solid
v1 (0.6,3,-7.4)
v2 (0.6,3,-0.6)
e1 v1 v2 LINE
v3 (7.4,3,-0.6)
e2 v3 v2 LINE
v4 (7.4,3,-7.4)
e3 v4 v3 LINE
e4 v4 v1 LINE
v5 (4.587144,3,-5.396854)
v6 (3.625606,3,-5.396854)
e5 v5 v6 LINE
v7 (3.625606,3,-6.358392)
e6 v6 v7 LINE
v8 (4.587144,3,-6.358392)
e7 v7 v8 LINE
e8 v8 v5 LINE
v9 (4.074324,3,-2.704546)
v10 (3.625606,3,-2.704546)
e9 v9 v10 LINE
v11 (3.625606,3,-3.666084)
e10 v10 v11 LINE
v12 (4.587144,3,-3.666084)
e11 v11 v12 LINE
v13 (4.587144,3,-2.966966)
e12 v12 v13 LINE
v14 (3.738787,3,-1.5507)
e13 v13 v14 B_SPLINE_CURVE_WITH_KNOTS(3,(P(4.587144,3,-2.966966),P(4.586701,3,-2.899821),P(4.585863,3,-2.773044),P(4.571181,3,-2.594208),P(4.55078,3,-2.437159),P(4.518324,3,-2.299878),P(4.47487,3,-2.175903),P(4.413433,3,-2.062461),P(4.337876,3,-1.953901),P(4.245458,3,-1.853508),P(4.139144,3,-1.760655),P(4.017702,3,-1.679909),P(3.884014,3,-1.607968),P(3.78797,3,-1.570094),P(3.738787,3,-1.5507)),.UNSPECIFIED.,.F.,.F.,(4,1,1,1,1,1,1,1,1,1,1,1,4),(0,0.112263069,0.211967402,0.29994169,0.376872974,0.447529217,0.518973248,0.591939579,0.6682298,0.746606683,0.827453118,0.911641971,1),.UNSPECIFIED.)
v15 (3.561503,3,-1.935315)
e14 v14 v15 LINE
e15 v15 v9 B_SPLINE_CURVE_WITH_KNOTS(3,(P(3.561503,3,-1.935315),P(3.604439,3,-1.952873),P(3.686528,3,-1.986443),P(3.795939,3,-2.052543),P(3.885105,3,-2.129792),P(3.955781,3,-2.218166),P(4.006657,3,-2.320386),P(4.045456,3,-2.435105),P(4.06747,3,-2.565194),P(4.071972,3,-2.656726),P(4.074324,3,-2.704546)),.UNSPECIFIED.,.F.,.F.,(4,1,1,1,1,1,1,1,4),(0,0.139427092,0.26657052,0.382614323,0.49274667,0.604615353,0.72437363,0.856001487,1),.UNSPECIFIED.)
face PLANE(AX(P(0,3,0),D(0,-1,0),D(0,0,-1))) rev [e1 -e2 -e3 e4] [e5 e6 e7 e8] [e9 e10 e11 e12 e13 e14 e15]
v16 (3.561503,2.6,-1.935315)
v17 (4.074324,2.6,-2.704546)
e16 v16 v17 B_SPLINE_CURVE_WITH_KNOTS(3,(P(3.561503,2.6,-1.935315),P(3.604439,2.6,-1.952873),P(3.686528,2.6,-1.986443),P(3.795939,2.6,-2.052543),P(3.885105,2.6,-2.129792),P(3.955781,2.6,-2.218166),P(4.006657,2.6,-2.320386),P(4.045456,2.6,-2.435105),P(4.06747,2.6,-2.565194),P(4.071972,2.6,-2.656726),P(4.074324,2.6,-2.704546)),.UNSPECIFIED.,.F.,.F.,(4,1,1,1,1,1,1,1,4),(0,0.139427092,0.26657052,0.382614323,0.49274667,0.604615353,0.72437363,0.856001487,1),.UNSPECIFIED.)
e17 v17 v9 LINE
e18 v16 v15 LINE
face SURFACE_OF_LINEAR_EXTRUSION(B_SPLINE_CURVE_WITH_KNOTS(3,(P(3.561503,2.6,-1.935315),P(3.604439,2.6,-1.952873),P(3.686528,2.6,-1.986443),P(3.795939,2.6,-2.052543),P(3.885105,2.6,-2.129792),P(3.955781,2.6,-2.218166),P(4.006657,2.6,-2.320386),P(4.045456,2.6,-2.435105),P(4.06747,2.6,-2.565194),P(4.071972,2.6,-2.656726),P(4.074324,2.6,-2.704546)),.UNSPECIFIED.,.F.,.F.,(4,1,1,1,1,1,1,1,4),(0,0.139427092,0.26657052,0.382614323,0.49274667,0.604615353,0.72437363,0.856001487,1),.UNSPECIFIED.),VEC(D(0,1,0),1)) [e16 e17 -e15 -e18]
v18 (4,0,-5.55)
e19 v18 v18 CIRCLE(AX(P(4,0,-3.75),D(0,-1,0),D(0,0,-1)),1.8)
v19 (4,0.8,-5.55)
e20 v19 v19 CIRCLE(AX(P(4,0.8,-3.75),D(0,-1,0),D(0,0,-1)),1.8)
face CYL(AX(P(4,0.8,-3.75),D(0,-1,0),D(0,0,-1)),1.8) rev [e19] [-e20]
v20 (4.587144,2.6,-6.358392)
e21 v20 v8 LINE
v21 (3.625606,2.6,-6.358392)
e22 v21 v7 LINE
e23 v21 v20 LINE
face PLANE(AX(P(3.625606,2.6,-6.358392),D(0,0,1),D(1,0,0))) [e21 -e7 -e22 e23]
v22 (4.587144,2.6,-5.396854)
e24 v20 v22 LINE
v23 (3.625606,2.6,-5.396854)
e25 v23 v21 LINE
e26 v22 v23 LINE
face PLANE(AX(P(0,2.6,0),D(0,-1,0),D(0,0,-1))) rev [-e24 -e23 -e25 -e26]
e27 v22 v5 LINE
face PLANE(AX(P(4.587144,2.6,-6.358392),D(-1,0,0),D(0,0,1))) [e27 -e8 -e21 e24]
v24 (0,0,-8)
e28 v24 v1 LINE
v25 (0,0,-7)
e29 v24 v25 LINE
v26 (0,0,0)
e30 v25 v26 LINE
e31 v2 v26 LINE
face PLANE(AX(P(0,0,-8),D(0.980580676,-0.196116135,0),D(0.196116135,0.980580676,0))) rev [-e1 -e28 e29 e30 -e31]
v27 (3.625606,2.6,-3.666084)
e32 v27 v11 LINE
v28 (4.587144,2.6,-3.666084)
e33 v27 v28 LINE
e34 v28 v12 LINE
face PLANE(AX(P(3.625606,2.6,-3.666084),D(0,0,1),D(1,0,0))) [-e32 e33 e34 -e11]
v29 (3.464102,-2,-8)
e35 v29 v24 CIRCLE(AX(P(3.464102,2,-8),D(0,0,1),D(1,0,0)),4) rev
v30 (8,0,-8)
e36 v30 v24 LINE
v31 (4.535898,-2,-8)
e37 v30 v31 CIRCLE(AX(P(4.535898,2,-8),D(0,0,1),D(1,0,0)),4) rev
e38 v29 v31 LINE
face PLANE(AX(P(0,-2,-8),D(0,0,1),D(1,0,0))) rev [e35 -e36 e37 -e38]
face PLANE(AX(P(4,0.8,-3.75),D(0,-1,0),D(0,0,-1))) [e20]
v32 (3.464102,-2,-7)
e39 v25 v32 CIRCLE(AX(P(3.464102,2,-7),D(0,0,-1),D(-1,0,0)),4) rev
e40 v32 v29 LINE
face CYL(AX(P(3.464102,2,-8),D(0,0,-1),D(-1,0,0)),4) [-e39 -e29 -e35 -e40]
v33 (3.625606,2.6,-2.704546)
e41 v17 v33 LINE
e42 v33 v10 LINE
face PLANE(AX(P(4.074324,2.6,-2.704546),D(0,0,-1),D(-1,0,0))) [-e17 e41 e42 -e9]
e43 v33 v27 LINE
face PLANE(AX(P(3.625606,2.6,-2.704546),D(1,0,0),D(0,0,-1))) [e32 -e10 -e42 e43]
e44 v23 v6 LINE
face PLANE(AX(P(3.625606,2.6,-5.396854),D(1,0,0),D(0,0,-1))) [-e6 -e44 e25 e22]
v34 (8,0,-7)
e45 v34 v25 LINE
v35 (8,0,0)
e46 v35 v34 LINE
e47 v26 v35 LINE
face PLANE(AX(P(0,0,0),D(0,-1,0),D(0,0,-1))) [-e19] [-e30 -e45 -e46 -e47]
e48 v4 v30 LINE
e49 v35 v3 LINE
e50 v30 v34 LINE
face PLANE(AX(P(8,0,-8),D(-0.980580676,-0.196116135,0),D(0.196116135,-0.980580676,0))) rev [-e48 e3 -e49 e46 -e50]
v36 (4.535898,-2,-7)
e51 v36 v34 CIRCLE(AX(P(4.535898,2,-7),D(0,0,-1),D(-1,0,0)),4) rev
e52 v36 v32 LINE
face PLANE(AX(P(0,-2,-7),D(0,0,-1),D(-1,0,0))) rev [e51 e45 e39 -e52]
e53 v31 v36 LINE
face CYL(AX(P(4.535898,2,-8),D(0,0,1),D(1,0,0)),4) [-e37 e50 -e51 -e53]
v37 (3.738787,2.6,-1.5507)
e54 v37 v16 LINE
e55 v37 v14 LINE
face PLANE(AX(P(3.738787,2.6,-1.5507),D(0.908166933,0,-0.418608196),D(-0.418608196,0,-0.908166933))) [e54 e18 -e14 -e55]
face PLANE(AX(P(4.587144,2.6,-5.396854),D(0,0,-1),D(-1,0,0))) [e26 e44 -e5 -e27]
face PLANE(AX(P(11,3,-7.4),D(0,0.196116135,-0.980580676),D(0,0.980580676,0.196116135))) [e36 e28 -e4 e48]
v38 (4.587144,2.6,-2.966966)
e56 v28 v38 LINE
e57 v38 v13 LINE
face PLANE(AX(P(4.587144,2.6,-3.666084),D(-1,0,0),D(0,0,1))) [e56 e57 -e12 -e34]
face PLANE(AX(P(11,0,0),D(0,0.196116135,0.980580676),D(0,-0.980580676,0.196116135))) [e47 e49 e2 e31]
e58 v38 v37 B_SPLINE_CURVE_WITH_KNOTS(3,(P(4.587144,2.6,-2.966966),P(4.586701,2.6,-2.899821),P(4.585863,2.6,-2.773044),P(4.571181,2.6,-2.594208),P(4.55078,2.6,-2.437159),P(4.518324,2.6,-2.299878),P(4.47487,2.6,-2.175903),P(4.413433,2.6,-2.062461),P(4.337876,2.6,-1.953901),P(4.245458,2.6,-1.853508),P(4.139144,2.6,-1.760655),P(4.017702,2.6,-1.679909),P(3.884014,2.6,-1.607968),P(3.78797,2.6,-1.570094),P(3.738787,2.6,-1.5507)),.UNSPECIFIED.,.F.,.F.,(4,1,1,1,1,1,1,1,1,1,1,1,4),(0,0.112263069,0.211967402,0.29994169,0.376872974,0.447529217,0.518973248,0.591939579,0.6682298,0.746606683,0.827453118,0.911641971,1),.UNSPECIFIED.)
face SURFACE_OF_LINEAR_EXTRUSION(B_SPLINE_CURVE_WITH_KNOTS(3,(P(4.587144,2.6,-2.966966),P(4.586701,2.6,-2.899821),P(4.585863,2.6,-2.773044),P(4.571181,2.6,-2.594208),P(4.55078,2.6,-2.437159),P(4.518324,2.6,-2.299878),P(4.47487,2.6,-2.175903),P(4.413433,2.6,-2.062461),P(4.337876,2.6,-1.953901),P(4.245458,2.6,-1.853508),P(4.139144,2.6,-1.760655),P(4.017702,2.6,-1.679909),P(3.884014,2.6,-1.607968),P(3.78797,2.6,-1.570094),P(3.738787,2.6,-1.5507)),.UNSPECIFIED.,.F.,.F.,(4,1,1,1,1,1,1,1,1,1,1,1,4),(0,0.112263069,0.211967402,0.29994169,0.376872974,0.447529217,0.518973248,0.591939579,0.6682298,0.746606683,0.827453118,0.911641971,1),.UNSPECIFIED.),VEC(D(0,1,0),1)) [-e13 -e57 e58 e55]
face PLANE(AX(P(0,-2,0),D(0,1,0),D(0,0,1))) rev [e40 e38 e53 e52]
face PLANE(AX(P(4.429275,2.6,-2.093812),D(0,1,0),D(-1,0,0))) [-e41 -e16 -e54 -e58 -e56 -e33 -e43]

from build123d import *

# Parameters (mm, degrees)
SKETCH1_W               = 8
SKETCH1_H               = 8
BOSS_EXTRUDE1_DEPTH     = 3
CUT_EXTRUDE1_DEPTH      = 12.704699911
CUT_EXTRUDE1_DEPTH_BACK = 12.704699911
CUT_EXTRUDE2_DEPTH      = 11
SKETCH4_R               = 1.8
CUT_EXTRUDE3_DEPTH      = 0.8
SKETCH5_W               = 8
SKETCH5_H               = 1
BOSS_EXTRUDE2_DEPTH     = 2
FILLET1_R               = 4
SKETCH6_W               = 0.961538461
SKETCH6_H               = 0.961538462
CUT_EXTRUDE4_DEPTH      = 0.4


with BuildPart() as part:
    # Sketch1 → Boss-Extrude1 (new body)
    with BuildSketch(Plane(origin=(0, 0, 0), x_dir=(1, 0, 0), z_dir=(0, 1, 0))):
        with Locations((4, 4)):
            Rectangle(SKETCH1_W, SKETCH1_H)
    extrude(amount=BOSS_EXTRUDE1_DEPTH)

    # Sketch2 → Cut-Extrude1 (cut, two sides: drawn at the far end of the back side and taken through both)
    with BuildSketch(Plane.XY.offset(-CUT_EXTRUDE1_DEPTH_BACK)):
        Polygon((0, 0), (0.6, 3), (0, 3), align=None)
        Polygon((8, 0), (7.4, 3), (8, 3), align=None)
    extrude(amount=CUT_EXTRUDE1_DEPTH + CUT_EXTRUDE1_DEPTH_BACK, mode=Mode.SUBTRACT)

    # Sketch3 → Cut-Extrude2 (cut)
    with BuildSketch(Plane(origin=(0, 0, 0), x_dir=(0, 0, -1), z_dir=(1, 0, 0))):
        Polygon((0, 0), (0.6, 3), (0, 3), align=None)
        Polygon((8, 3), (7.4, 3), (8, 0), align=None)
    extrude(amount=CUT_EXTRUDE2_DEPTH, mode=Mode.SUBTRACT)

    # Sketch4 → Cut-Extrude3 (cut)
    with BuildSketch(Plane.XZ):
        with Locations(Location((4, -3.75, 0), (0, 0, 270))):
            Circle(SKETCH4_R)
    extrude(amount=-CUT_EXTRUDE3_DEPTH, mode=Mode.SUBTRACT)

    # Sketch5 → Boss-Extrude2 (add)
    with BuildSketch(Plane.XZ):
        with Locations((4, -7.5)):
            Rectangle(SKETCH5_W, SKETCH5_H)
    extrude(amount=BOSS_EXTRUDE2_DEPTH)

    # Fillet1
    # the kernel refuses this fillet: 4 mm, written as the material it takes off along each edge
    with BuildSketch(Plane(origin=(8, -2, -16.660254038), x_dir=(0, 1, 0), z_dir=(0, 0, 1)), Plane(origin=(0, -2, 1.660254038), x_dir=(0, 1, 0), z_dir=(0, 0, -1))) as fillet1_piece_1:
        with BuildLine():
            CenterArc((4, 3.464101615), FILLET1_R, 180, 60)
            Line((0, 3.464101615), (-0.08, 3.464101615))
            Line((-0.08, 3.464101615), (-0.08, 0))
            Line((-0.08, 0), (0, -0.08))
            ThreePointArc((0, -0.08), (1, -0.08), (1.96, -0.069282032))
            Line((1.96, -0.069282032), (2, 0))
        make_face()
    extrude(amount=18.320508076, mode=Mode.SUBTRACT)

    # Sketch6 → Cut-Extrude4 (cut)
    with BuildSketch(Plane(origin=(0, 3, 0), x_dir=(1, 0, 0), z_dir=(0, 1, 0))):
        with Locations((4.106375193, 5.877622732)):
            Rectangle(SKETCH6_W, SKETCH6_H)
        with BuildLine():
            Line((3.625605963, 3.666084271), (4.587144424, 3.666084271))
            Line((4.587144424, 3.666084271), (4.587144424, 2.966965681))
            add(Edge.make_bspline(
                [(4.587144424, 2.966965681), (4.586700802, 2.899821455), (4.585863185, 2.773044347), (4.571180714, 2.594207821), (4.550779556, 2.437158718), (4.518324342, 2.299878361), (4.47486997, 2.175902827), (4.413432502, 2.062461013), (4.337876173, 1.953901165), (4.245458326, 1.85350819), (4.139144335, 1.760654771), (4.017702284, 1.679908688), (3.88401418, 1.607967915), (3.787969656, 1.570094118), (3.738787052, 1.550699655)],
                knots=[0, 0, 0, 0, 1.347156832, 2.543608823, 3.599300285, 4.522475688, 5.370350604, 6.227678973, 7.103274953, 8.018757603, 8.959280198, 9.929437417, 10.939703653, 12, 12, 12, 12], degree=3))
            Line((3.738787052, 1.550699655), (3.561503399, 1.93531504))
            add(Edge.make_bspline(
                [(3.561503399, 1.93531504), (3.604439047, 1.952873279), (3.686527672, 1.986442858), (3.795938691, 2.052543314), (3.885105421, 2.129792439), (3.955780801, 2.218165676), (4.006656804, 2.32038588), (4.045456087, 2.435104657), (4.0674697, 2.56519407), (4.07197182, 2.656725854), (4.074323911, 2.704545809)],
                knots=[0, 0, 0, 0, 1.115416734, 2.132564161, 3.06091458, 3.941973359, 4.836922823, 5.794989041, 6.848011894, 8, 8, 8, 8], degree=3))
            Line((4.074323911, 2.704545809), (3.625605963, 2.704545809))
            Line((3.625605963, 2.704545809), (3.625605963, 3.666084271))
        make_face()
    extrude(amount=-CUT_EXTRUDE4_DEPTH, mode=Mode.SUBTRACT)


solid = part.part
